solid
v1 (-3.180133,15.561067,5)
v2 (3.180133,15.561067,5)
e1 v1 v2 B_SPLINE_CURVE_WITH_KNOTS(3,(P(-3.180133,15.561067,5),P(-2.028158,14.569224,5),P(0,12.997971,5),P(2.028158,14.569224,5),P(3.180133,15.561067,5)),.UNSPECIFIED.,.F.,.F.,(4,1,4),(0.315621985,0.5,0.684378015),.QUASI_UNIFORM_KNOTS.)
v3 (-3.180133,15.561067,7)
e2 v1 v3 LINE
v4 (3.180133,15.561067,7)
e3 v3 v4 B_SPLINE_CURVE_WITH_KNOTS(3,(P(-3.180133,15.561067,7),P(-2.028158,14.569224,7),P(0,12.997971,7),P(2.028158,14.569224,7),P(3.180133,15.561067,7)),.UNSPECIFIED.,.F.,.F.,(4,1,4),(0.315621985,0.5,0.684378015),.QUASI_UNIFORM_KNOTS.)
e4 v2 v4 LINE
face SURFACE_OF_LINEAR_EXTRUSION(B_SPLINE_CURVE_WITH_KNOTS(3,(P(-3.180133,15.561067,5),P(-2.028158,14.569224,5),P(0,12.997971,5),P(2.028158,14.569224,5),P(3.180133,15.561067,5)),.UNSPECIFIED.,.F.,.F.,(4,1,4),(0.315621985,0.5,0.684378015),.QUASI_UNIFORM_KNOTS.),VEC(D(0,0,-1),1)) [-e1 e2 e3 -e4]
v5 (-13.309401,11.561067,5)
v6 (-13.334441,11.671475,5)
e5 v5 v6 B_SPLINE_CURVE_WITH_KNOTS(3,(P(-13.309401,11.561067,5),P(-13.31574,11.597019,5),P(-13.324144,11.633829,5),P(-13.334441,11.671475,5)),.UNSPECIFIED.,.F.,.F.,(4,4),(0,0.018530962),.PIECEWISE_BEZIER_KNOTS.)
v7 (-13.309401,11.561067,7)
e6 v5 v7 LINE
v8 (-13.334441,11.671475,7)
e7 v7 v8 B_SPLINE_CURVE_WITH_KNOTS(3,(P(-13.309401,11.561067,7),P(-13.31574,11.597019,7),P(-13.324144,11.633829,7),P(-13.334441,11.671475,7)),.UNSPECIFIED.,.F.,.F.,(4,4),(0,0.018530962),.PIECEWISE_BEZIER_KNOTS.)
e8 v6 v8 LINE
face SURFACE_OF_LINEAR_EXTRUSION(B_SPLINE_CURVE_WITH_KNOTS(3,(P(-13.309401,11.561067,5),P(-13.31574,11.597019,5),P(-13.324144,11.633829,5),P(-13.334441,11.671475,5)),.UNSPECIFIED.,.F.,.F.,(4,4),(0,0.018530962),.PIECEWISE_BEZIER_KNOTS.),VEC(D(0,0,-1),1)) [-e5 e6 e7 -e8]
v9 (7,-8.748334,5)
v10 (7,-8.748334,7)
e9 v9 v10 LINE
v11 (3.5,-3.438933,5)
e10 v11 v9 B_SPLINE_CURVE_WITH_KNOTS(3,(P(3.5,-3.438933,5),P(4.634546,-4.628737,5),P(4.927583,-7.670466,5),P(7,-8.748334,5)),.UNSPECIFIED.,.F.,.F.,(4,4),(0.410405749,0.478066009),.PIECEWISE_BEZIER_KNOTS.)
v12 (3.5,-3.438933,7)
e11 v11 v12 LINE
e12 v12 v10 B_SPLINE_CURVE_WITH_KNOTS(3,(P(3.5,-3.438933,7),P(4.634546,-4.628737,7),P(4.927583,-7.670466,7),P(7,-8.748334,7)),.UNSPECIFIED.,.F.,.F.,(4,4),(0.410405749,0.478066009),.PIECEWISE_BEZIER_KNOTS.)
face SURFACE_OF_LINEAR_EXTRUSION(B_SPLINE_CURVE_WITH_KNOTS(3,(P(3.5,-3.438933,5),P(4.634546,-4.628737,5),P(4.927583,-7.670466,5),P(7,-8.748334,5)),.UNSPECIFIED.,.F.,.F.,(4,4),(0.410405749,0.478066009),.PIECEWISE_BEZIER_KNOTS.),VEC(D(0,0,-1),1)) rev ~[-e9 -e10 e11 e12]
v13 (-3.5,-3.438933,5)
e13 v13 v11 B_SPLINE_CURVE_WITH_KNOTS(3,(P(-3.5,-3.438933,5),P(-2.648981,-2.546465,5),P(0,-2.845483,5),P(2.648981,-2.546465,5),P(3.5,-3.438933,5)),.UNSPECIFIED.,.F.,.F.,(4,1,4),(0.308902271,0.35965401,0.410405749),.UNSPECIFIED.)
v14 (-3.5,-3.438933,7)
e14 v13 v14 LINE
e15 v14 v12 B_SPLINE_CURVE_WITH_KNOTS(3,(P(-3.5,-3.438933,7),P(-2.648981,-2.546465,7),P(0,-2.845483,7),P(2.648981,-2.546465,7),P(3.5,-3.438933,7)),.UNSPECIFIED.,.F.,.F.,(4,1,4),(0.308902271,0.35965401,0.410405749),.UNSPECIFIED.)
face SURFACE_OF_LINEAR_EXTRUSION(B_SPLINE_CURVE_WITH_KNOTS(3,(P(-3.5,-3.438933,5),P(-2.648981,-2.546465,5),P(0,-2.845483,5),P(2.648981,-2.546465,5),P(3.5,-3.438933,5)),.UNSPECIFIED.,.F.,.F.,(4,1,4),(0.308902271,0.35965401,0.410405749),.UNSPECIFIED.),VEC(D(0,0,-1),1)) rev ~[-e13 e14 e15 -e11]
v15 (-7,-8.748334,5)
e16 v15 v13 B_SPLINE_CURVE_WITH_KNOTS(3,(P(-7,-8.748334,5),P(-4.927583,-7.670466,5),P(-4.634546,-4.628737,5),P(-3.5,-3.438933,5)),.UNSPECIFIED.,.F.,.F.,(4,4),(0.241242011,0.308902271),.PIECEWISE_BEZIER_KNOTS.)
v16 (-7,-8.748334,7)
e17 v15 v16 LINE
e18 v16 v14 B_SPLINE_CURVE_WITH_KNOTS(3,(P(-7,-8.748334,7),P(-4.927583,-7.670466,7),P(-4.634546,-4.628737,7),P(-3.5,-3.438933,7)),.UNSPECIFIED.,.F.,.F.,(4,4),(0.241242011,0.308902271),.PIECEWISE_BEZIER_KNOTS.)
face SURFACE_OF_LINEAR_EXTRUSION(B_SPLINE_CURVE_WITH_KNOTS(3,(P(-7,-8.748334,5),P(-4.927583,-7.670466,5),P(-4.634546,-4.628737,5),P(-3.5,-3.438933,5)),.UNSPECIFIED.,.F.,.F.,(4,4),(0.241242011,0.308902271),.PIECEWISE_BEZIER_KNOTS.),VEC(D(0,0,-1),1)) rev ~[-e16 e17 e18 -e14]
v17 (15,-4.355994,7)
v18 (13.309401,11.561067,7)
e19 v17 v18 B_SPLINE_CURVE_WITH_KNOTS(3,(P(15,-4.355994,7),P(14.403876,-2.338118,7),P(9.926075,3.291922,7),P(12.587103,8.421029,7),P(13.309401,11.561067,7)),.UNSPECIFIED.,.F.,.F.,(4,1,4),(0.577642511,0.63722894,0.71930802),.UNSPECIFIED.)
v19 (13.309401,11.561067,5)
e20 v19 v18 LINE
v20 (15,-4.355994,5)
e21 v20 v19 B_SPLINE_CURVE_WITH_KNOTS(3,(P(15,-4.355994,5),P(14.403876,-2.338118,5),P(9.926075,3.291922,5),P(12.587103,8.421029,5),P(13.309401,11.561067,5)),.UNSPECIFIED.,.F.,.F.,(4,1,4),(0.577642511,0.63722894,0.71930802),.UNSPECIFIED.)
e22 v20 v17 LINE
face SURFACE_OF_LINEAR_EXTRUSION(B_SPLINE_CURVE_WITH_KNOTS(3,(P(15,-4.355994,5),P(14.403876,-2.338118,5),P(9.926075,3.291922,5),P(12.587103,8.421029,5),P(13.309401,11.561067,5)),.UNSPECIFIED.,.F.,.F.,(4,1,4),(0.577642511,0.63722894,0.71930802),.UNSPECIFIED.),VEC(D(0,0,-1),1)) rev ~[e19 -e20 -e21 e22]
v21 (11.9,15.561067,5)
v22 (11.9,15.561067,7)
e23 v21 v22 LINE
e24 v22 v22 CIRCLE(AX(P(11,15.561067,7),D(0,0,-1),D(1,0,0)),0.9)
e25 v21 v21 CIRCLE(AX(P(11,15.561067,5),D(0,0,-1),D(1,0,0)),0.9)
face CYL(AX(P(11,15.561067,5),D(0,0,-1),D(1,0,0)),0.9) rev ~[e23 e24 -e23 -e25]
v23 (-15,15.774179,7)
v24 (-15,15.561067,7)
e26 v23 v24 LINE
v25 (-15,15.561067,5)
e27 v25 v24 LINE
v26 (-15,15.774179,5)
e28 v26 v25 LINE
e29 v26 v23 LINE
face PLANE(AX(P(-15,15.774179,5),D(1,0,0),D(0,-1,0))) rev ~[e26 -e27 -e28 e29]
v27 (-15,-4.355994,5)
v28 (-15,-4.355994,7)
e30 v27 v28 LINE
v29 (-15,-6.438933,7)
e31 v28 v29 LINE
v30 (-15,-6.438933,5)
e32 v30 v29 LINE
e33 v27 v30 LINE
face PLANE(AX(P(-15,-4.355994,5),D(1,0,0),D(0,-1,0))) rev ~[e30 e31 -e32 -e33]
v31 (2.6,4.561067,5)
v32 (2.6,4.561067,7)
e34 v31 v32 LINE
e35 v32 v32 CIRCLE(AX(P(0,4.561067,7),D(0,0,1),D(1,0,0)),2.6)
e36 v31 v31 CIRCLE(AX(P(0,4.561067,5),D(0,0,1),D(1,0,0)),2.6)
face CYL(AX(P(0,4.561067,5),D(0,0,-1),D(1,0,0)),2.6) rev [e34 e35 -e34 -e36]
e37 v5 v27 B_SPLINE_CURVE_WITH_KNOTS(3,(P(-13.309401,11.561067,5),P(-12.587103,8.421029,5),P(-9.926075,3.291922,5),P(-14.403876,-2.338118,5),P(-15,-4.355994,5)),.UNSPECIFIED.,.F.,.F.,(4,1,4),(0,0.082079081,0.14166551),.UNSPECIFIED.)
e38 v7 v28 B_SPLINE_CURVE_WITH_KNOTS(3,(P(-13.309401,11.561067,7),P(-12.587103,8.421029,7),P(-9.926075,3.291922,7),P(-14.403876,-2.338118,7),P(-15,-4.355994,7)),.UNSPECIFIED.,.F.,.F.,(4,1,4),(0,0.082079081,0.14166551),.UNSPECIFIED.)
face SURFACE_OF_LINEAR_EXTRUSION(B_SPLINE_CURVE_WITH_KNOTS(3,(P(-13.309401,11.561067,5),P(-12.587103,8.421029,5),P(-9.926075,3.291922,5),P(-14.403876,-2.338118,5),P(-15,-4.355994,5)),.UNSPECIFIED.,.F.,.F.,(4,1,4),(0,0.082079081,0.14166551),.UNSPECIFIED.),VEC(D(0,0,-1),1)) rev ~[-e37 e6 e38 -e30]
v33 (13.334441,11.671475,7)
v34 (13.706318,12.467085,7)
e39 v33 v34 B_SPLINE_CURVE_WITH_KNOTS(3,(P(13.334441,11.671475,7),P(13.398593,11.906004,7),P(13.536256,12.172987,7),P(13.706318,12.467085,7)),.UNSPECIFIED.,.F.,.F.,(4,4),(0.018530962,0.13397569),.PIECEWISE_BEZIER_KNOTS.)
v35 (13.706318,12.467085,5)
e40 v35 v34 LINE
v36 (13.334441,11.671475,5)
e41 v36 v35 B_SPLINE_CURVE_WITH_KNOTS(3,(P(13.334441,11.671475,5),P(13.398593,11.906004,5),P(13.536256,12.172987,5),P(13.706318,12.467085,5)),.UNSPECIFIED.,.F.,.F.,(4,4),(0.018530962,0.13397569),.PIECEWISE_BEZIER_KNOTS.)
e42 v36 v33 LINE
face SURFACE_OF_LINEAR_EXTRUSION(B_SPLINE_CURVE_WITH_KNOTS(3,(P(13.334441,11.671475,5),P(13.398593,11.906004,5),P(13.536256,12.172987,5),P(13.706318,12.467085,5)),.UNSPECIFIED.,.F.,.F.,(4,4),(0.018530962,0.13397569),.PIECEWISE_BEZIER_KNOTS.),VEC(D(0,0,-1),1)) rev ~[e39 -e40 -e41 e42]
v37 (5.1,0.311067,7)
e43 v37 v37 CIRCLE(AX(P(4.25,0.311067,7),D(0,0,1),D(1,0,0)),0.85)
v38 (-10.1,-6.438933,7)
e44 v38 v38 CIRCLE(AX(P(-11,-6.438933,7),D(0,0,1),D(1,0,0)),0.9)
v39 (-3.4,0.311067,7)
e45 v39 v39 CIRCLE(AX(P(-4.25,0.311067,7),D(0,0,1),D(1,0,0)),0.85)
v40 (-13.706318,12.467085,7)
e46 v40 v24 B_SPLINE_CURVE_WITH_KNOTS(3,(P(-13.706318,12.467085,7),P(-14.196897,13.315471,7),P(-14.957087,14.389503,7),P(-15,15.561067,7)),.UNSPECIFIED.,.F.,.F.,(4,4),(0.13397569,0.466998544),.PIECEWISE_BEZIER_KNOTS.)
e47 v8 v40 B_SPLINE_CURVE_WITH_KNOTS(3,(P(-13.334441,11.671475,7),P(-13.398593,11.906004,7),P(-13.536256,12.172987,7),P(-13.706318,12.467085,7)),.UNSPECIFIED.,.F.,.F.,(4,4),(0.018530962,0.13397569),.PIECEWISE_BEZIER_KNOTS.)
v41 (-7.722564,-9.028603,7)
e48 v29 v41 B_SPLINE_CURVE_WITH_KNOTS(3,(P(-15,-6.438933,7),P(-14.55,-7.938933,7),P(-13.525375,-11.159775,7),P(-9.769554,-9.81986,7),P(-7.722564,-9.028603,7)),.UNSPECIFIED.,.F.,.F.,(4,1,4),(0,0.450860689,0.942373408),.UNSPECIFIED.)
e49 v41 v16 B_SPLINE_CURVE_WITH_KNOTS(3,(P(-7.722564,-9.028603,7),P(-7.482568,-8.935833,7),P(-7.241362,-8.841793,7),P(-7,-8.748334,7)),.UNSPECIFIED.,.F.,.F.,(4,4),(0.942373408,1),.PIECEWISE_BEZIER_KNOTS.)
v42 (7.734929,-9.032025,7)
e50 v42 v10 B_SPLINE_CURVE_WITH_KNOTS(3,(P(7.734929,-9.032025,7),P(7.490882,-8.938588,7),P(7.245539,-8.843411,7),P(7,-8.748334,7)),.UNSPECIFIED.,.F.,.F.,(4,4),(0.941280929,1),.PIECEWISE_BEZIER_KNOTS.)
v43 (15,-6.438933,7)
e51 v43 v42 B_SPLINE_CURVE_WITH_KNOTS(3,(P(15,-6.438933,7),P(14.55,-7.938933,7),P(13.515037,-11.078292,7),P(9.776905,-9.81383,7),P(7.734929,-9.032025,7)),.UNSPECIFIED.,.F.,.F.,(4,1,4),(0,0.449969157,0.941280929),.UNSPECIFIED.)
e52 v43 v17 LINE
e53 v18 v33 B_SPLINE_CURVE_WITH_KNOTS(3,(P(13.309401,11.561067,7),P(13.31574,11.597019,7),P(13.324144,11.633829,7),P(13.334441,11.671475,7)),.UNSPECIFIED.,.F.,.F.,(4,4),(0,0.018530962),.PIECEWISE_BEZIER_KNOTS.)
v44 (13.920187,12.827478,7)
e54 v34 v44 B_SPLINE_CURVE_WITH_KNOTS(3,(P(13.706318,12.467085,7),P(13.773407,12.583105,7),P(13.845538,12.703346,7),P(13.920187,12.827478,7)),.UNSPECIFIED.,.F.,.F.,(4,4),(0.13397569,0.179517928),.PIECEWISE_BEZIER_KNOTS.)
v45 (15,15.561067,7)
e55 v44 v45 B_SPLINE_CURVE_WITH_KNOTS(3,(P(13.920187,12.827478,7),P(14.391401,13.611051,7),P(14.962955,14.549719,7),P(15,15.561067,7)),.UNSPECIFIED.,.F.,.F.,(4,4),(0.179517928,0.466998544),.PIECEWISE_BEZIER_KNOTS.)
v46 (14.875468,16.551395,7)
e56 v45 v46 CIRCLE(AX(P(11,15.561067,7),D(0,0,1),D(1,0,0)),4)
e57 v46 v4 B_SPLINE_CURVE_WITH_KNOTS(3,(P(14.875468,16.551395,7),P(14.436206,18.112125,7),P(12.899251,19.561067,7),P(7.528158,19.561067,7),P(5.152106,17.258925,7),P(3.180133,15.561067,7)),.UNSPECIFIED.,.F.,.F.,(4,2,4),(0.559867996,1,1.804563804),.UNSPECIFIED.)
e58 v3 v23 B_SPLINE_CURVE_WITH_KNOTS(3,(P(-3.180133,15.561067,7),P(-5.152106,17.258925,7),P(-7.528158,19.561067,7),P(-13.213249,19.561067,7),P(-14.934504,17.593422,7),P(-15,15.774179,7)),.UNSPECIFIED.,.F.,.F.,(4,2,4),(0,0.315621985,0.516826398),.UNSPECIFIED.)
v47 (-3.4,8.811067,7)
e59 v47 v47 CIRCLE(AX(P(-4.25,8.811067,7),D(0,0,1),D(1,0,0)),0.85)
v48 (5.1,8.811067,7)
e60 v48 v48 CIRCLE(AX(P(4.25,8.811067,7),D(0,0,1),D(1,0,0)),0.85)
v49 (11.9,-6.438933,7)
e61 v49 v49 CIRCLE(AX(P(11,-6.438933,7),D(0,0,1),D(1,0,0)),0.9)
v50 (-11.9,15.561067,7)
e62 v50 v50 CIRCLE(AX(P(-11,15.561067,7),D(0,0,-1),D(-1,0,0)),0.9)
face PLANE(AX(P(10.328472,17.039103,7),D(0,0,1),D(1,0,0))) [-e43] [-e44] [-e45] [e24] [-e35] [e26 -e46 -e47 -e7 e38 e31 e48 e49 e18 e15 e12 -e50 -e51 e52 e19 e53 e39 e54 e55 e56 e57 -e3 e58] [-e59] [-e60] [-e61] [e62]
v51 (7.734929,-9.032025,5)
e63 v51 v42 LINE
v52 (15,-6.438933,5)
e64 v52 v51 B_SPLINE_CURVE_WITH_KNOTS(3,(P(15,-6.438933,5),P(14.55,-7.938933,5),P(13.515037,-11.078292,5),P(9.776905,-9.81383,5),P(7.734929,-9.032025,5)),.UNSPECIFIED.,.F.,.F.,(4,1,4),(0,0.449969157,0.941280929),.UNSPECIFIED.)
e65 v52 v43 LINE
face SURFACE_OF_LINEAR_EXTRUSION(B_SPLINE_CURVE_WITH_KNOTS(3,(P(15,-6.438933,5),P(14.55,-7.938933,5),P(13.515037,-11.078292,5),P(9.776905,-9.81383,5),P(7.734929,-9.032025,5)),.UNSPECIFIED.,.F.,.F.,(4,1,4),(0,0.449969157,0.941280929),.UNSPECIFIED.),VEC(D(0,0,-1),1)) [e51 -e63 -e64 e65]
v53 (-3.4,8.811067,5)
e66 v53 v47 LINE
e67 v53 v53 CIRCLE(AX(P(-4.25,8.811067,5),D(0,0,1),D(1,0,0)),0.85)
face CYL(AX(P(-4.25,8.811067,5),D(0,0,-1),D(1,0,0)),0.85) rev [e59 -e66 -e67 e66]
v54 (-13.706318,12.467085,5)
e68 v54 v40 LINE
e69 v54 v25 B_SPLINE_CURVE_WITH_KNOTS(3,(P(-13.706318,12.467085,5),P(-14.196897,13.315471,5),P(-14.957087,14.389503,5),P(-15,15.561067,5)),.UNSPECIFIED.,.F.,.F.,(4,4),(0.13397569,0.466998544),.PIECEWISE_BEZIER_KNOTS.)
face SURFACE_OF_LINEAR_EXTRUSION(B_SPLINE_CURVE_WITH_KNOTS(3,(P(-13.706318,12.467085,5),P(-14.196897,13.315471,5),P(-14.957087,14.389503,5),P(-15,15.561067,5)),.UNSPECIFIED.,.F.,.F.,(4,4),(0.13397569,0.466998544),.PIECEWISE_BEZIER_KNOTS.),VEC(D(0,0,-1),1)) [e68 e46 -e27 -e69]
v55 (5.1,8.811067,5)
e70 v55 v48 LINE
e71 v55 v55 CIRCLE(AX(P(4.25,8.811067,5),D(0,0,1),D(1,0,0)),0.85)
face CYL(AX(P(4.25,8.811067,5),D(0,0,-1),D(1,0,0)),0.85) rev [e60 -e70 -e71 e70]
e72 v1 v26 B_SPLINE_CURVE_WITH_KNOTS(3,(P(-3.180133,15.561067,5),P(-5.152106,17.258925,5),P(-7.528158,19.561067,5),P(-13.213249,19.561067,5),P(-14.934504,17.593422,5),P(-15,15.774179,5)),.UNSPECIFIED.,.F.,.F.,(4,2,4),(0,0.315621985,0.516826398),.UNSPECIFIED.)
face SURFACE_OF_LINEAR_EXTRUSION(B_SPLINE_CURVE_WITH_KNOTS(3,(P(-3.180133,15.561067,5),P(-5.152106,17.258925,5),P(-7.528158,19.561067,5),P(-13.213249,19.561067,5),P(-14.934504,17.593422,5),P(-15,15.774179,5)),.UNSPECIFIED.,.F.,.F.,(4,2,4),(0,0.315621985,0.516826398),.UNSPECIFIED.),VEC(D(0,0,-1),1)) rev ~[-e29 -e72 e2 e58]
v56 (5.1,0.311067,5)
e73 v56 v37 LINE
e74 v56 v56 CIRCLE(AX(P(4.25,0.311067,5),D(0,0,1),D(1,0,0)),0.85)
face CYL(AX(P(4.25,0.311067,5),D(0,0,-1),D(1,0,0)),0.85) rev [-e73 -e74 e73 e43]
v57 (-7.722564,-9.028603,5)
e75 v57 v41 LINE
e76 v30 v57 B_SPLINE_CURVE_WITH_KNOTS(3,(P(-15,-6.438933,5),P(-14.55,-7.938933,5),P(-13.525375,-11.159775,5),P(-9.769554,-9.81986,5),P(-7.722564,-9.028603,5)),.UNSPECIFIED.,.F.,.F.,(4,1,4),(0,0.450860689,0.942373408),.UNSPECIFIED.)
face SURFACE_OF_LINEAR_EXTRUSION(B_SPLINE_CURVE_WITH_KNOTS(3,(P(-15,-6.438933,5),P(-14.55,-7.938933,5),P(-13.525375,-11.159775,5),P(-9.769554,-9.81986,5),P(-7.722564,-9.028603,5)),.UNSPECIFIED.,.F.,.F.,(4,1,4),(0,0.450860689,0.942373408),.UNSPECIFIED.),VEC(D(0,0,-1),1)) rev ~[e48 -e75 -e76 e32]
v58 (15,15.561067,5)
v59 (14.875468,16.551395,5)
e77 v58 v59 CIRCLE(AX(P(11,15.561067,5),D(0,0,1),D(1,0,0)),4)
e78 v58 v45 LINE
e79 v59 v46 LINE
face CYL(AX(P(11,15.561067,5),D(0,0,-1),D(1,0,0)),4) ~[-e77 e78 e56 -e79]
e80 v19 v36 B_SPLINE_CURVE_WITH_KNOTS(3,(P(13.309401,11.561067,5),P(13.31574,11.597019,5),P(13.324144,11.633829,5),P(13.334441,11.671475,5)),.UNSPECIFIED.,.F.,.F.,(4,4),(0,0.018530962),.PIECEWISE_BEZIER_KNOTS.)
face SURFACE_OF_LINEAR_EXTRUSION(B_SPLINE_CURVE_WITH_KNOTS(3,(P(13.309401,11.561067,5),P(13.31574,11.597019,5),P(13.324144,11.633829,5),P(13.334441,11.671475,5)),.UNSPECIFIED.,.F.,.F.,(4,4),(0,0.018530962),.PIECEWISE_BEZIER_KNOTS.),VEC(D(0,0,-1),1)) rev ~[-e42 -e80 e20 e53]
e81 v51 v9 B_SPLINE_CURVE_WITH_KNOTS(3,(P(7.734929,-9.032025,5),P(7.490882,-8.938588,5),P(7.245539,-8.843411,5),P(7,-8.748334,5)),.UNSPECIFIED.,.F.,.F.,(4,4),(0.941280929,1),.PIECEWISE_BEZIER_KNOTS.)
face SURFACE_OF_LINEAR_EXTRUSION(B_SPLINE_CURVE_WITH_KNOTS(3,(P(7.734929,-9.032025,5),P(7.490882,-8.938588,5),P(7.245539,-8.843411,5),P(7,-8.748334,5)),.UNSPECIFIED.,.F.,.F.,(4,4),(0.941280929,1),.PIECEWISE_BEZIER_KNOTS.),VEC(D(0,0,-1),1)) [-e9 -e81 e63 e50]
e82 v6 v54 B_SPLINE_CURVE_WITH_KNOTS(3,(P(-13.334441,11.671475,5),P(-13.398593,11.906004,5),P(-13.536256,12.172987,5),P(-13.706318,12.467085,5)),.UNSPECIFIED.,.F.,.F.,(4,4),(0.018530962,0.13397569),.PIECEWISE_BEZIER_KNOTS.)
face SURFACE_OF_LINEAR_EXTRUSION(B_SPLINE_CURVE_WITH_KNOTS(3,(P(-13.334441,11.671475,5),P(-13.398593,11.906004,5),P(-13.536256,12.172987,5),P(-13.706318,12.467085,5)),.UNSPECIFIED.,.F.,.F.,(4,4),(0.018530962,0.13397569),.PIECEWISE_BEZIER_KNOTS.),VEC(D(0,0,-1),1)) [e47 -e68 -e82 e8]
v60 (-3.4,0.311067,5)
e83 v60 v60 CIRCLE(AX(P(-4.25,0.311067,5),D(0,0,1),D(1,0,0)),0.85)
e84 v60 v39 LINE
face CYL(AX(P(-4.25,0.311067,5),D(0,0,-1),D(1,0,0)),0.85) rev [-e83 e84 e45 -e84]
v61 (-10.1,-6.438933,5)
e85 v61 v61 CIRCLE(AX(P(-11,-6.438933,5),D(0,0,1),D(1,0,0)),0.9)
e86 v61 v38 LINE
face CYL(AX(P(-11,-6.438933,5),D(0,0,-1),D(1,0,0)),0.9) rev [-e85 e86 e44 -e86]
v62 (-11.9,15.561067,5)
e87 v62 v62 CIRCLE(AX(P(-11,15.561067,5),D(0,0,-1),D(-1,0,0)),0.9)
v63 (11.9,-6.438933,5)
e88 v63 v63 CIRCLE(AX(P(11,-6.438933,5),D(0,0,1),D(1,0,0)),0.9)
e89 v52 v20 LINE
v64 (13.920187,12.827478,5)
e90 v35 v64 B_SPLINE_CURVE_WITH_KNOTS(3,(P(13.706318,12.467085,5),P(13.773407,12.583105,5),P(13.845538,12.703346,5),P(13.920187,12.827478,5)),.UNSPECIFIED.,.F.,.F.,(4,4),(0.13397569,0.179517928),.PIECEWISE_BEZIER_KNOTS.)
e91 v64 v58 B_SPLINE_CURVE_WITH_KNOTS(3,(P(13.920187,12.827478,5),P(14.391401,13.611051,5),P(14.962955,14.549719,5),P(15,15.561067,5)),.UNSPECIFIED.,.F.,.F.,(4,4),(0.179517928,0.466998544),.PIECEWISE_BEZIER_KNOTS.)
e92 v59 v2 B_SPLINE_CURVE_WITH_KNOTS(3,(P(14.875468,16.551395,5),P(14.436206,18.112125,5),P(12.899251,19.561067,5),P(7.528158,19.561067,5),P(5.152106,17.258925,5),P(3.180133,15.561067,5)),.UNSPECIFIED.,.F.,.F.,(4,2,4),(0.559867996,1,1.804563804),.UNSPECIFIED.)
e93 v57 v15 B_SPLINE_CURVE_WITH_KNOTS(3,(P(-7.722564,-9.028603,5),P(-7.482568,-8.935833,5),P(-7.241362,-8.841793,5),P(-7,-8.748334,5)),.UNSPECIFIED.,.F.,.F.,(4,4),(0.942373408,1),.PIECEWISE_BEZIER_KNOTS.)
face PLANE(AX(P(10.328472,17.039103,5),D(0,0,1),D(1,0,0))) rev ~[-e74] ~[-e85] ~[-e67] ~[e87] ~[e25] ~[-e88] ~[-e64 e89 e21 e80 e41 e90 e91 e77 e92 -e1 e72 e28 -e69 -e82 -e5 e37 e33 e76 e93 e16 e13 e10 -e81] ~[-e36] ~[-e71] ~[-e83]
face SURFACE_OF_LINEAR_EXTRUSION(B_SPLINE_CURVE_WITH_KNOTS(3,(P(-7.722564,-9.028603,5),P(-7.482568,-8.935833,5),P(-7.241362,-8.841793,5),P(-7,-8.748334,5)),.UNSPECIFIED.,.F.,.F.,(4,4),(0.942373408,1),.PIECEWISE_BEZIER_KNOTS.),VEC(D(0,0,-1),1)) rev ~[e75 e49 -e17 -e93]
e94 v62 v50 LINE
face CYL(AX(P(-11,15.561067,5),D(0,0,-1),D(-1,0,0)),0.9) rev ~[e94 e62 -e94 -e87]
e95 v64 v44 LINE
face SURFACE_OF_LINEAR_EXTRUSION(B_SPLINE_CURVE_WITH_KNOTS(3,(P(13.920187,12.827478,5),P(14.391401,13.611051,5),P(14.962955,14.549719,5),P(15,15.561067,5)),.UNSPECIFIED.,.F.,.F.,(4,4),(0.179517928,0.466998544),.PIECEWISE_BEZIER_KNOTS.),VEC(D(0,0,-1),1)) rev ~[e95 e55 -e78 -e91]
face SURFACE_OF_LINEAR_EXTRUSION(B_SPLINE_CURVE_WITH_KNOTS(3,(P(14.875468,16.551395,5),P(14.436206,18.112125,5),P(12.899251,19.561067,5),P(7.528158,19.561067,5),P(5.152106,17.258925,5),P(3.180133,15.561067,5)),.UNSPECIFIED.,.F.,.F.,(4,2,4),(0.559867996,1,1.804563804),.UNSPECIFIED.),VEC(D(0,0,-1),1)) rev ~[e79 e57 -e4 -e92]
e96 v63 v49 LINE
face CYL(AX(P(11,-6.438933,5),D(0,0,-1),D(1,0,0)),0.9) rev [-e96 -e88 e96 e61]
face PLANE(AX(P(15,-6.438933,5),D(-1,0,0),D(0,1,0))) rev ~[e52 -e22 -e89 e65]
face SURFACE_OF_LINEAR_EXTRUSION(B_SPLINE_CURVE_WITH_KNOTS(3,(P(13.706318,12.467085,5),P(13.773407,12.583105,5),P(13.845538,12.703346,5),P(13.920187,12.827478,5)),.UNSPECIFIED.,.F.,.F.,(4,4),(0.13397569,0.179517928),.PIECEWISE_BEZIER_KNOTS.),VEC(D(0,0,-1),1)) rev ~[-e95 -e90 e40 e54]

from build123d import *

# Parameters (mm, degrees)
F3_R     = 0.9
F3_R_2   = 0.85
F3_R_3   = 2.6
F4_DEPTH = 2


with BuildPart() as f4:
    # F3 (on offset) → F4 (new body)
    with BuildSketch(Plane.XY.offset(5)):
        with BuildLine():
            add(Edge.make_bspline(
                [(13.5840897294, 15.5610671266), (13.3511585546, 17.1029676873), (12.6074515763, 18.5088140753), (11, 19.5610671266)],
                knots=[0.7544415636, 0.7544415636, 0.7544415636, 0.7544415636, 0.7967305031, 0.7967305031, 0.7967305031, 0.7967305031], degree=3))
            ThreePointArc((11, 19.5610671266), (8.1715728753, 18.3894942513), (7, 15.5610671266))
            Line((7, 15.5610671266), (10.1, 15.5610671266))
            ThreePointArc((10.1, 15.5610671266), (11, 16.4610671266), (11.9, 15.5610671266))
            Line((11.9, 15.5610671266), (13.5840897294, 15.5610671266))
        make_face()
        with BuildLine():
            add(Edge.make_bspline(
                [(14.8754677726, 16.5513951244), (14.4362064353, 18.1121245067), (12.8992511156, 19.5610671266), (11, 19.5610671266)],
                knots=[0.5598679958, 0.5598679958, 0.5598679958, 0.5598679958, 1, 1, 1, 1], degree=3))
            add(Edge.make_bspline(
                [(13.5840897294, 15.5610671266), (13.3511585546, 17.1029676873), (12.6074515763, 18.5088140753), (11, 19.5610671266)],
                knots=[0.7544415636, 0.7544415636, 0.7544415636, 0.7544415636, 0.7967305031, 0.7967305031, 0.7967305031, 0.7967305031], degree=3))
            Line((13.5840897294, 15.5610671266), (15, 15.5610671266))
            ThreePointArc((15, 15.5610671266), (14.9687448325, 16.0601307044), (14.8754677726, 16.5513951244))
        make_face()
        with BuildLine():
            ThreePointArc((7, 15.5610671266), (8.1715728753, 18.3894942513), (11, 19.5610671266))
            add(Edge.make_bspline(
                [(3.1801327541, 15.5610671266), (5.1521059489, 17.258924835), (7.5281581703, 19.5610671266), (11, 19.5610671266)],
                knots=[0.6843780155, 0.6843780155, 0.6843780155, 0.6843780155, 1, 1, 1, 1], degree=3))
            Line((3.1801327541, 15.5610671266), (7, 15.5610671266))
        make_face()
        with BuildLine():
            add(Edge.make_bspline(
                [(-11, 19.5610671266), (-7.5281581703, 19.5610671266), (-5.1521059489, 17.258924835), (-3.1801327541, 15.5610671266)],
                knots=[0, 0, 0, 0, 0.3156219845, 0.3156219845, 0.3156219845, 0.3156219845], degree=3))
            add(Edge.make_bspline(
                [(-11, 19.5610671266), (-12.6074515763, 18.5088140753), (-13.3511585546, 17.1029676873), (-13.5840897294, 15.5610671266)],
                knots=[0.9225775171, 0.9225775171, 0.9225775171, 0.9225775171, 0.9648664566, 0.9648664566, 0.9648664566, 0.9648664566], degree=3))
            Line((-13.5840897294, 15.5610671266), (-11.9, 15.5610671266))
            ThreePointArc((-11.9, 15.5610671266), (-11, 16.4610671266), (-10.1, 15.5610671266))
            Line((-10.1, 15.5610671266), (-3.1801327541, 15.5610671266))
        make_face()
        with BuildLine():
            add(Edge.make_bspline(
                [(-11, 19.5610671266), (-12.6074515763, 18.5088140753), (-13.3511585546, 17.1029676873), (-13.5840897294, 15.5610671266)],
                knots=[0.9225775171, 0.9225775171, 0.9225775171, 0.9225775171, 0.9648664566, 0.9648664566, 0.9648664566, 0.9648664566], degree=3))
            add(Edge.make_bspline(
                [(-15, 15.7741791911), (-14.9345041339, 17.5934219618), (-13.2132485479, 19.5610671266), (-11, 19.5610671266)],
                knots=[0.4871023051, 0.4871023051, 0.4871023051, 0.4871023051, 1, 1, 1, 1], degree=3))
            Line((-15, 15.7741791911), (-15, 15.5610671266))
            Line((-15, 15.5610671266), (-13.5840897294, 15.5610671266))
        make_face()
        with BuildLine():
            Line((10.1, 15.5610671266), (7, 15.5610671266))
            ThreePointArc((7, 15.5610671266), (7.384697146, 13.8494639969), (8.4647926368, 12.4670852867))
            Line((8.4647926368, 12.4670852867), (13.4691565234, 12.4670852867))
            Line((13.4691565234, 12.4670852867), (13.492215644, 12.4670852867))
            add(Edge.make_bspline(
                [(13.492215644, 12.4670852867), (13.6721160747, 13.5160999102), (13.734281279, 14.5668660077), (13.5840897294, 15.5610671266)],
                knots=[0.7271741042, 0.7271741042, 0.7271741042, 0.7271741042, 0.7544415636, 0.7544415636, 0.7544415636, 0.7544415636], degree=3))
            Line((13.5840897294, 15.5610671266), (11.9, 15.5610671266))
            ThreePointArc((11.9, 15.5610671266), (11, 14.6610671266), (10.1, 15.5610671266))
        make_face()
        with BuildLine():
            ThreePointArc((8.4647926368, 12.4670852867), (7.384697146, 13.8494639969), (7, 15.5610671266))
            Line((7, 15.5610671266), (3.1801327541, 15.5610671266))
            add(Edge.make_bspline(
                [(-3.1801327541, 15.5610671266), (-2.0281581703, 14.5692235599), (0, 12.9979712148), (2.0281581703, 14.5692235599), (3.1801327541, 15.5610671266)],
                knots=[0.3156219845, 0.3156219845, 0.3156219845, 0.3156219845, 0.5, 0.6843780155, 0.6843780155, 0.6843780155, 0.6843780155], degree=3))
            Line((-3.1801327541, 15.5610671266), (-10.1, 15.5610671266))
            ThreePointArc((-10.1, 15.5610671266), (-11, 14.6610671266), (-11.9, 15.5610671266))
            Line((-11.9, 15.5610671266), (-13.5840897294, 15.5610671266))
            add(Edge.make_bspline(
                [(-13.5840897294, 15.5610671266), (-13.734281279, 14.5668660077), (-13.6721160747, 13.5160999102), (-13.492215644, 12.4670852867)],
                knots=[0.9648664566, 0.9648664566, 0.9648664566, 0.9648664566, 0.992133916, 0.992133916, 0.992133916, 0.992133916], degree=3))
            Line((-13.492215644, 12.4670852867), (-13.4691565234, 12.4670852867))
            Line((-13.4691565234, 12.4670852867), (8.4647926368, 12.4670852867))
        make_face()
        with BuildLine():
            Line((15, 15.5610671266), (13.5840897294, 15.5610671266))
            add(Edge.make_bspline(
                [(13.492215644, 12.4670852867), (13.6721160747, 13.5160999102), (13.734281279, 14.5668660077), (13.5840897294, 15.5610671266)],
                knots=[0.7271741042, 0.7271741042, 0.7271741042, 0.7271741042, 0.7544415636, 0.7544415636, 0.7544415636, 0.7544415636], degree=3))
            Line((13.492215644, 12.4670852867), (13.5352073632, 12.4670852867))
            ThreePointArc((13.5352073632, 12.4670852867), (13.7336426306, 12.6409304914), (13.9201867728, 12.8274780551))
            add(Edge.make_bspline(
                [(13.9201867728, 12.8274780551), (14.3914007653, 13.6110512692), (14.9629553276, 14.5497192982), (15, 15.5610671266)],
                knots=[0.1795179278, 0.1795179278, 0.1795179278, 0.1795179278, 0.4669985441, 0.4669985441, 0.4669985441, 0.4669985441], degree=3))
        make_face()
        with BuildLine():
            add(Edge.make_bspline(
                [(-13.5840897294, 15.5610671266), (-13.734281279, 14.5668660077), (-13.6721160747, 13.5160999102), (-13.492215644, 12.4670852867)],
                knots=[0.9648664566, 0.9648664566, 0.9648664566, 0.9648664566, 0.992133916, 0.992133916, 0.992133916, 0.992133916], degree=3))
            Line((-13.5840897294, 15.5610671266), (-15, 15.5610671266))
            add(Edge.make_bspline(
                [(-13.7063183417, 12.4670852867), (-14.1968968928, 13.3154705741), (-14.9570867675, 14.3895031275), (-15, 15.5610671266)],
                knots=[0.1339756897, 0.1339756897, 0.1339756897, 0.1339756897, 0.4669985441, 0.4669985441, 0.4669985441, 0.4669985441], degree=3))
            Line((-13.7063183417, 12.4670852867), (-13.492215644, 12.4670852867))
        make_face()
        with BuildLine():
            Line((13.4691565234, 12.4670852867), (8.4647926368, 12.4670852867))
            ThreePointArc((8.4647926368, 12.4670852867), (10.9507937826, 11.5613697945), (13.4583242546, 12.4056524377))
            Line((13.4583242546, 12.4056524377), (13.4691565234, 12.4670852867))
        make_face()
        with BuildLine():
            ThreePointArc((13.4583242546, 12.4056524377), (10.9507937826, 11.5613697945), (8.4647926368, 12.4670852867))
            Line((8.4647926368, 12.4670852867), (-13.4691565234, 12.4670852867))
            Line((-13.4691565234, 12.4670852867), (-13.3094010768, 11.5610671266))
            add(Edge.make_bspline(
                [(-13.3094010768, 11.5610671266), (-12.5871033108, 8.4210285266), (-9.9260749254, 3.2919220303), (-14.403876313, -2.3381175367), (-15, -4.3559935783)],
                knots=[0, 0, 0, 0, 0.0820790806, 0.1416655097, 0.1416655097, 0.1416655097, 0.1416655097], degree=3))
            Line((-15, -4.3559935783), (-15, -6.4389328734))
            add(Edge.make_bspline(
                [(-15, -6.4389328734), (-14.1595926628, -8.4371784368), (-10.2189124595, -9.723491879), (-7.7225640289, -9.0286027112)],
                knots=[0.1638195279, 0.1638195279, 0.1638195279, 0.1638195279, 0.2339911879, 0.2339911879, 0.2339911879, 0.2339911879], degree=3))
            add(Edge.make_bspline(
                [(-7.7225640289, -9.0286027112), (-7.4825681334, -8.9358330473), (-7.2413616339, -8.8417932594), (-7, -8.7483339502)],
                knots=[0.9423734081, 0.9423734081, 0.9423734081, 0.9423734081, 1, 1, 1, 1], degree=3))
            add(Edge.make_bspline(
                [(-7, -8.7483339502), (-4.9275830737, -7.6704662943), (-4.6345461271, -4.6287367083), (-3.5, -3.4389328734)],
                knots=[0.2412420108, 0.2412420108, 0.2412420108, 0.2412420108, 0.3089022709, 0.3089022709, 0.3089022709, 0.3089022709], degree=3))
            add(Edge.make_bspline(
                [(-3.5, -3.4389328734), (-2.6489806718, -2.5464649198), (0, -2.84548287), (2.6489806718, -2.5464649198), (3.5, -3.4389328734)],
                knots=[0.3089022709, 0.3089022709, 0.3089022709, 0.3089022709, 0.3596540101, 0.4104057492, 0.4104057492, 0.4104057492, 0.4104057492], degree=3))
            add(Edge.make_bspline(
                [(3.5, -3.4389328734), (4.6345461271, -4.6287367083), (4.9275830737, -7.6704662943), (7, -8.7483339502)],
                knots=[0.4104057492, 0.4104057492, 0.4104057492, 0.4104057492, 0.4780660094, 0.4780660094, 0.4780660094, 0.4780660094], degree=3))
            add(Edge.make_bspline(
                [(7.7349288931, -9.0320251809), (7.4908824059, -8.9385878573), (7.2455387097, -8.8434106938), (7, -8.7483339502)],
                knots=[0.9412809289, 0.9412809289, 0.9412809289, 0.9412809289, 1, 1, 1, 1], degree=3))
            add(Edge.make_bspline(
                [(7.7349288931, -9.0320251809), (10.2319042389, -9.7192464231), (14.1609789052, -8.4338823534), (15, -6.4389328734)],
                knots=[0.4854325797, 0.4854325797, 0.4854325797, 0.4854325797, 0.5554884923, 0.5554884923, 0.5554884923, 0.5554884923], degree=3))
            Line((15, -6.4389328734), (15, -4.3559935783))
            add(Edge.make_bspline(
                [(15, -4.3559935783), (14.403876313, -2.3381175367), (9.9260749254, 3.2919220303), (12.5871033108, 8.4210285266), (13.3094010768, 11.5610671266)],
                knots=[0.5776425105, 0.5776425105, 0.5776425105, 0.5776425105, 0.6372289396, 0.7193080202, 0.7193080202, 0.7193080202, 0.7193080202], degree=3))
            Line((13.3094010768, 11.5610671266), (13.4583242546, 12.4056524377))
        make_face()
        with Locations((-11, -6.4389328734)):
            Circle(F3_R, mode=Mode.SUBTRACT)
        with Locations((-4.25, 0.3110671266)):
            Circle(F3_R_2, mode=Mode.SUBTRACT)
        with Locations((0, 4.5610671266)):
            Circle(F3_R_3, mode=Mode.SUBTRACT)
        with Locations((11, -6.4389328734)):
            Circle(F3_R, mode=Mode.SUBTRACT)
        with Locations((4.25, 0.3110671266)):
            Circle(F3_R_2, mode=Mode.SUBTRACT)
        with Locations((-4.25, 8.8110671266)):
            Circle(F3_R_2, mode=Mode.SUBTRACT)
        with Locations((4.25, 8.8110671266)):
            Circle(F3_R_2, mode=Mode.SUBTRACT)
        with BuildLine():
            Line((13.5352073632, 12.4670852867), (13.492215644, 12.4670852867))
            add(Edge.make_bspline(
                [(13.4852520955, 12.4268172926), (13.4875924233, 12.4402395891), (13.4899136722, 12.4536622945), (13.492215644, 12.4670852867)],
                knots=[0.726825195, 0.726825195, 0.726825195, 0.726825195, 0.7271741042, 0.7271741042, 0.7271741042, 0.7271741042], degree=3))
            ThreePointArc((13.4852520955, 12.4268172926), (13.5103104732, 12.4468511212), (13.5352073632, 12.4670852867))
        make_face()
        with BuildLine():
            add(Edge.make_bspline(
                [(13.4852520955, 12.4268172926), (13.4875924233, 12.4402395891), (13.4899136722, 12.4536622945), (13.492215644, 12.4670852867)],
                knots=[0.726825195, 0.726825195, 0.726825195, 0.726825195, 0.7271741042, 0.7271741042, 0.7271741042, 0.7271741042], degree=3))
            Line((13.492215644, 12.4670852867), (13.4691565234, 12.4670852867))
            Line((13.4691565234, 12.4670852867), (13.4583242546, 12.4056524377))
            ThreePointArc((13.4583242546, 12.4056524377), (13.4718108282, 12.4162060438), (13.4852520955, 12.4268172926))
        make_face()
        with BuildLine():
            add(Edge.make_bspline(
                [(13.7063183417, 12.4670852867), (13.7734069659, 12.5831054462), (13.8455377753, 12.7033455891), (13.9201867728, 12.8274780551)],
                knots=[0.1339756897, 0.1339756897, 0.1339756897, 0.1339756897, 0.1795179278, 0.1795179278, 0.1795179278, 0.1795179278], degree=3))
            ThreePointArc((13.9201867728, 12.8274780551), (13.7336426306, 12.6409304914), (13.5352073632, 12.4670852867))
            Line((13.5352073632, 12.4670852867), (13.7063183417, 12.4670852867))
        make_face()
        with BuildLine():
            Line((-13.4691565234, 12.4670852867), (-13.492215644, 12.4670852867))
            add(Edge.make_bspline(
                [(-13.492215644, 12.4670852867), (-13.4466612755, 12.2014539119), (-13.3935576871, 11.9359348422), (-13.3344412049, 11.671474935)],
                knots=[0.992133916, 0.992133916, 0.992133916, 0.992133916, 0.9990385792, 0.9990385792, 0.9990385792, 0.9990385792], degree=3))
            add(Edge.make_bspline(
                [(-13.3094010768, 11.5610671266), (-13.3157403301, 11.597018819), (-13.324143718, 11.6338287797), (-13.3344412049, 11.671474935)],
                knots=[0, 0, 0, 0, 0.0185309619, 0.0185309619, 0.0185309619, 0.0185309619], degree=3))
            Line((-13.3094010768, 11.5610671266), (-13.4691565234, 12.4670852867))
        make_face()
        with BuildLine():
            add(Edge.make_bspline(
                [(-13.492215644, 12.4670852867), (-13.4466612755, 12.2014539119), (-13.3935576871, 11.9359348422), (-13.3344412049, 11.671474935)],
                knots=[0.992133916, 0.992133916, 0.992133916, 0.992133916, 0.9990385792, 0.9990385792, 0.9990385792, 0.9990385792], degree=3))
            Line((-13.492215644, 12.4670852867), (-13.7063183417, 12.4670852867))
            add(Edge.make_bspline(
                [(-13.3344412049, 11.671474935), (-13.3985927892, 11.9060040524), (-13.5362558173, 12.1729865265), (-13.7063183417, 12.4670852867)],
                knots=[0.0185309619, 0.0185309619, 0.0185309619, 0.0185309619, 0.1339756897, 0.1339756897, 0.1339756897, 0.1339756897], degree=3))
        make_face()
        with BuildLine():
            ThreePointArc((13.4852520955, 12.4268172926), (13.4718108282, 12.4162060438), (13.4583242546, 12.4056524377))
            Line((13.4583242546, 12.4056524377), (13.3094010768, 11.5610671266))
            add(Edge.make_bspline(
                [(13.3094010768, 11.5610671266), (13.3157403301, 11.597018819), (13.324143718, 11.6338287797), (13.3344412049, 11.671474935)],
                knots=[0, 0, 0, 0, 0.0185309619, 0.0185309619, 0.0185309619, 0.0185309619], degree=3))
            add(Edge.make_bspline(
                [(13.3344412049, 11.671474935), (13.390570389, 11.9225710471), (13.4412790174, 12.1746219822), (13.4852520955, 12.4268172926)],
                knots=[0.720269441, 0.720269441, 0.720269441, 0.720269441, 0.726825195, 0.726825195, 0.726825195, 0.726825195], degree=3))
        make_face()
        with BuildLine():
            ThreePointArc((13.5352073632, 12.4670852867), (13.5103104732, 12.4468511212), (13.4852520955, 12.4268172926))
            add(Edge.make_bspline(
                [(13.3344412049, 11.671474935), (13.390570389, 11.9225710471), (13.4412790174, 12.1746219822), (13.4852520955, 12.4268172926)],
                knots=[0.720269441, 0.720269441, 0.720269441, 0.720269441, 0.726825195, 0.726825195, 0.726825195, 0.726825195], degree=3))
            add(Edge.make_bspline(
                [(13.3344412049, 11.671474935), (13.3985927892, 11.9060040524), (13.5362558173, 12.1729865265), (13.7063183417, 12.4670852867)],
                knots=[0.0185309619, 0.0185309619, 0.0185309619, 0.0185309619, 0.1339756897, 0.1339756897, 0.1339756897, 0.1339756897], degree=3))
            Line((13.7063183417, 12.4670852867), (13.5352073632, 12.4670852867))
        make_face()
        with BuildLine():
            add(Edge.make_bspline(
                [(15, -6.4389328734), (14.55, -7.9389328734), (13.5150373015, -11.0782924932), (9.776904521, -9.8138300729), (7.7349288931, -9.0320251809)],
                knots=[0, 0, 0, 0, 0.4499691569, 0.9412809289, 0.9412809289, 0.9412809289, 0.9412809289], degree=3))
            add(Edge.make_bspline(
                [(7.7349288931, -9.0320251809), (10.2319042389, -9.7192464231), (14.1609789052, -8.4338823534), (15, -6.4389328734)],
                knots=[0.4854325797, 0.4854325797, 0.4854325797, 0.4854325797, 0.5554884923, 0.5554884923, 0.5554884923, 0.5554884923], degree=3))
        make_face()
        with BuildLine():
            add(Edge.make_bspline(
                [(-15, -6.4389328734), (-14.1595926628, -8.4371784368), (-10.2189124595, -9.723491879), (-7.7225640289, -9.0286027112)],
                knots=[0.1638195279, 0.1638195279, 0.1638195279, 0.1638195279, 0.2339911879, 0.2339911879, 0.2339911879, 0.2339911879], degree=3))
            add(Edge.make_bspline(
                [(-15, -6.4389328734), (-14.55, -7.9389328734), (-13.5253754228, -11.1597748555), (-9.7695536439, -9.8198601549), (-7.7225640289, -9.0286027112)],
                knots=[0, 0, 0, 0, 0.4508606887, 0.9423734081, 0.9423734081, 0.9423734081, 0.9423734081], degree=3))
        make_face()
    extrude(amount=F4_DEPTH)


solid = f4.part
